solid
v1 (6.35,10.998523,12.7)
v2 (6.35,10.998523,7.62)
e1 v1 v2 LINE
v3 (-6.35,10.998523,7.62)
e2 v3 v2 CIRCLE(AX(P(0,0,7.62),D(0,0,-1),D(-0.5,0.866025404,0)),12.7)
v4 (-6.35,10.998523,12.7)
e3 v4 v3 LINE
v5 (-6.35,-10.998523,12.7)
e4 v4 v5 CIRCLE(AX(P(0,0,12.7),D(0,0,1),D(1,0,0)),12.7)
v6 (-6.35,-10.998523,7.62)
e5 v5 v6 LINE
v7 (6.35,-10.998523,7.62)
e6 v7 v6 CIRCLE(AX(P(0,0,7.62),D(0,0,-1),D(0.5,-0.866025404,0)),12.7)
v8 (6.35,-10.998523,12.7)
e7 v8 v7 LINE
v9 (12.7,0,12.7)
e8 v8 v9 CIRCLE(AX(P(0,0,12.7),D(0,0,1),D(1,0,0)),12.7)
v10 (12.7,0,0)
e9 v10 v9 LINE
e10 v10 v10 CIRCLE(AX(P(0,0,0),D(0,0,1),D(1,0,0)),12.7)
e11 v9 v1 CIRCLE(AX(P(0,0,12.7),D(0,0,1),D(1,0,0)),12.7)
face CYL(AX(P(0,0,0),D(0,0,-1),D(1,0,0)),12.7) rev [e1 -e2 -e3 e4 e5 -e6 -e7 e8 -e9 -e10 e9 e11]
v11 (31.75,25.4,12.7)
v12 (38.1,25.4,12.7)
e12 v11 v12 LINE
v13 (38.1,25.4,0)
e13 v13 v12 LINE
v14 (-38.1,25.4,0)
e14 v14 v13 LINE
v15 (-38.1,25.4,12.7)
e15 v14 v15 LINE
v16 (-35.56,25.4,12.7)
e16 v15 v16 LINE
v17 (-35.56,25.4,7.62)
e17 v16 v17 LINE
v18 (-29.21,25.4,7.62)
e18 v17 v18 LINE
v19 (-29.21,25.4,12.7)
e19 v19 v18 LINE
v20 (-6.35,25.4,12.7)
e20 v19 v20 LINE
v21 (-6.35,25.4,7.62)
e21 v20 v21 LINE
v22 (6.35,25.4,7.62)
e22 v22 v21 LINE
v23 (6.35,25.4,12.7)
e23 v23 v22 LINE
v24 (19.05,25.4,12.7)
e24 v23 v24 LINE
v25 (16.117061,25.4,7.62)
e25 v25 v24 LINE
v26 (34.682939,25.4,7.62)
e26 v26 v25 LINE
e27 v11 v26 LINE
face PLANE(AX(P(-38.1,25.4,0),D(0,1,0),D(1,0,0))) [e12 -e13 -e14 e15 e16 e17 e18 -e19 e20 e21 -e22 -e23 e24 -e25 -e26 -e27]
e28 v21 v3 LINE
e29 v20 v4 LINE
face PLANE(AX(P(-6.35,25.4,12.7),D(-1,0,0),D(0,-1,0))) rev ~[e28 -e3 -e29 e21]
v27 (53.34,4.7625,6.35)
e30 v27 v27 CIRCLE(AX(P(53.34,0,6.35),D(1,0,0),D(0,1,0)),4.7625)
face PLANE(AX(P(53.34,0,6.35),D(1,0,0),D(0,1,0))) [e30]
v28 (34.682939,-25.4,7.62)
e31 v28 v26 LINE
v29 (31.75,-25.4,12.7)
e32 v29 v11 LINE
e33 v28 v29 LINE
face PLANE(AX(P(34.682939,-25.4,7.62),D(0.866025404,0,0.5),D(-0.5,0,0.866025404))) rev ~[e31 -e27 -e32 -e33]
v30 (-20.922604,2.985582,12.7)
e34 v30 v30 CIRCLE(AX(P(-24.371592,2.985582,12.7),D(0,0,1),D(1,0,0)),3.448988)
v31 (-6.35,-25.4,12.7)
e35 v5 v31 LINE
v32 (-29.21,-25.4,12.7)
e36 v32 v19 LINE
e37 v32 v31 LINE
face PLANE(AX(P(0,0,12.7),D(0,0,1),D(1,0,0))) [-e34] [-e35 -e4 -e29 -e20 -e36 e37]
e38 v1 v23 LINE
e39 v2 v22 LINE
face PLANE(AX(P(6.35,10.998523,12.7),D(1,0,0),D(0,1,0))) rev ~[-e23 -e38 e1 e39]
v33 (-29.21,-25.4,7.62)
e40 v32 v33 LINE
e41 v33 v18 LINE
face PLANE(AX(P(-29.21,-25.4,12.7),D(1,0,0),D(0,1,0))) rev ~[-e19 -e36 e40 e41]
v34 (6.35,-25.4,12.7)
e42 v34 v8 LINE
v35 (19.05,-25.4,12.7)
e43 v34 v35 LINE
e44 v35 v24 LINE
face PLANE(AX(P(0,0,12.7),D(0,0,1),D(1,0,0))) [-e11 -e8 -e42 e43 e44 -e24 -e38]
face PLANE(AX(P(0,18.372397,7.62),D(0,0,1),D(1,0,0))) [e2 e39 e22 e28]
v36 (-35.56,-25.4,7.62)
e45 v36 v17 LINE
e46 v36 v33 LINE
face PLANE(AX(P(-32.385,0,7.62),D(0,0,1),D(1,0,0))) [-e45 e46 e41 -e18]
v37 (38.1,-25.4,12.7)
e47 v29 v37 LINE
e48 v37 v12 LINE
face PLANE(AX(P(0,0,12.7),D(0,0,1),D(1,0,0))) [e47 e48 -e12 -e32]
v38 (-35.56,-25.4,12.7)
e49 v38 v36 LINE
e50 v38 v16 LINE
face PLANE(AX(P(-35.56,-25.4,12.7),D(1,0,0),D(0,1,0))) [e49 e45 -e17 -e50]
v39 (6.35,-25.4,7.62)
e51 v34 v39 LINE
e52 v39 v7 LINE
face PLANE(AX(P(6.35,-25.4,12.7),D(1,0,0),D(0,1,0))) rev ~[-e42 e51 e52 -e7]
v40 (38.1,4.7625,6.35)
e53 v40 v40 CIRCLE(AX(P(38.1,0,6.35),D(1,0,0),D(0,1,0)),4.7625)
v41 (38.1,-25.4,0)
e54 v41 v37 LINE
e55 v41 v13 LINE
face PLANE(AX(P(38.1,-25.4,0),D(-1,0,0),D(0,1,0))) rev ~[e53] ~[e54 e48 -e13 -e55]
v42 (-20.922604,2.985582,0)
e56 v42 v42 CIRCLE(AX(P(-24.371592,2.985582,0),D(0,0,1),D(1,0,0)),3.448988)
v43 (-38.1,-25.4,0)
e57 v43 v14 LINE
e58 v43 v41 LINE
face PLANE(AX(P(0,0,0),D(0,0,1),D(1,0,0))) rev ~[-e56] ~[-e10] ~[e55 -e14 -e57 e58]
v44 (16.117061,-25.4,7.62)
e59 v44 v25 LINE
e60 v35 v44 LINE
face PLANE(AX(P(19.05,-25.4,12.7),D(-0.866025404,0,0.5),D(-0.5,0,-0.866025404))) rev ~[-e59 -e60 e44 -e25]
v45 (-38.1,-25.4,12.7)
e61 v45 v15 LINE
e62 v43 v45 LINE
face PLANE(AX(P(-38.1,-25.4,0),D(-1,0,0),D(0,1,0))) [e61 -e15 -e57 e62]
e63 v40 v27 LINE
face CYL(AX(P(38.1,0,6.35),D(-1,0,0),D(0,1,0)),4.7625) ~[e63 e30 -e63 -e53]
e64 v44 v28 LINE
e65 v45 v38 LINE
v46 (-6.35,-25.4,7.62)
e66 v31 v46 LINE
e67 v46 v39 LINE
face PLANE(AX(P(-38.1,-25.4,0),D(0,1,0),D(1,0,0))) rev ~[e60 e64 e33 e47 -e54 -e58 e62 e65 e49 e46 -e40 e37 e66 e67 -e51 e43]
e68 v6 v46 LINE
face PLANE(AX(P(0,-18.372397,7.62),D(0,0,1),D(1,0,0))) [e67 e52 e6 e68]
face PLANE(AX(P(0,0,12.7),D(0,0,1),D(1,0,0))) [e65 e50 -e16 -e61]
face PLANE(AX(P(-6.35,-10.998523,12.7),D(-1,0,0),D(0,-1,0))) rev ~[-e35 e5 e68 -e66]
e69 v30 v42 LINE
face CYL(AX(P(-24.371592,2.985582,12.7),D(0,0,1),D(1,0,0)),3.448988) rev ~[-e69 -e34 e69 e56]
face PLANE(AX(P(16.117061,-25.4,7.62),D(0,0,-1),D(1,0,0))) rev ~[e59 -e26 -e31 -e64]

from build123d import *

# Parameters (mm, degrees)
F0_W      = 76.2
F0_H      = 50.8
F0_R      = 12.7
F1_DEPTH  = 12.7
F2_W      = 6.35
F2_H      = 50.8
F3_DEPTH  = 5.08
F5_DEPTH  = 50.801
F6_R      = 4.7625
F7_DEPTH  = 15.24
F8_R      = 3.4489881571
F9_DEPTH  = 12.701
F10_R     = 4.2111787038
F11_DEPTH = 113


# Not quite as in the source:
# - an extrude ends at something that could not be found from the text; its depth is read off the source's solid


with BuildPart() as f1:
    # F0 (on Top) → F1 (new body)
    with BuildSketch(Plane.XY):
        Rectangle(F0_W, F0_H)
        Circle(F0_R, mode=Mode.SUBTRACT)
    extrude(amount=F1_DEPTH)

    # F2 (on face) → F3 (cut)
    with BuildSketch(Plane.XY.offset(12.7)):
        with Locations((-32.385, 0)):
            Rectangle(F2_W, F2_H)
        with BuildLine():
            Line((6.35, 25.4), (-6.35, 25.4))
            Line((-6.35, 25.4), (-6.35, 10.9985226281))
            ThreePointArc((-6.35, 10.9985226281), (0, 12.7), (6.35, 10.9985226281))
            Line((6.35, 10.9985226281), (6.35, 25.4))
        make_face()
        with BuildLine():
            Line((-6.35, -10.9985226281), (-6.35, -25.4))
            Line((-6.35, -25.4), (6.35, -25.4))
            Line((6.35, -25.4), (6.35, -10.9985226281))
            ThreePointArc((6.35, -10.9985226281), (0, -12.7), (-6.35, -10.9985226281))
        make_face()
    extrude(amount=-F3_DEPTH, mode=Mode.SUBTRACT)

    # F4 (on face) → F5 (cut, through all)
    with BuildSketch(Plane.XZ.offset(25.4)):
        Polygon((31.75, 12.7), (19.05, 12.7), (16.1170606325, 7.62), (34.6829393675, 7.62), align=None)
    extrude(amount=-F5_DEPTH, mode=Mode.SUBTRACT)

    # F6 (on face) → F7 (join)
    with BuildSketch(Plane.YZ.offset(38.1)):
        with Locations((0, 6.35)):
            Circle(F6_R)
    extrude(amount=F7_DEPTH)

    # F8 (on face) → F9 (cut, through all)
    with BuildSketch(Plane.XY.offset(12.7)):
        with Locations((-24.371592328, 2.9855815228)):
            Circle(F8_R)
    extrude(amount=-F9_DEPTH, mode=Mode.SUBTRACT)

    # F10 (on face) → F11 (cut, through all)
    with BuildSketch(Plane.XY.offset(12.7)):
        with Locations((-20.9910459816, -11.7274438962)):
            Circle(F10_R)
    extrude(amount=F11_DEPTH, mode=Mode.SUBTRACT)


solid = f1.part
